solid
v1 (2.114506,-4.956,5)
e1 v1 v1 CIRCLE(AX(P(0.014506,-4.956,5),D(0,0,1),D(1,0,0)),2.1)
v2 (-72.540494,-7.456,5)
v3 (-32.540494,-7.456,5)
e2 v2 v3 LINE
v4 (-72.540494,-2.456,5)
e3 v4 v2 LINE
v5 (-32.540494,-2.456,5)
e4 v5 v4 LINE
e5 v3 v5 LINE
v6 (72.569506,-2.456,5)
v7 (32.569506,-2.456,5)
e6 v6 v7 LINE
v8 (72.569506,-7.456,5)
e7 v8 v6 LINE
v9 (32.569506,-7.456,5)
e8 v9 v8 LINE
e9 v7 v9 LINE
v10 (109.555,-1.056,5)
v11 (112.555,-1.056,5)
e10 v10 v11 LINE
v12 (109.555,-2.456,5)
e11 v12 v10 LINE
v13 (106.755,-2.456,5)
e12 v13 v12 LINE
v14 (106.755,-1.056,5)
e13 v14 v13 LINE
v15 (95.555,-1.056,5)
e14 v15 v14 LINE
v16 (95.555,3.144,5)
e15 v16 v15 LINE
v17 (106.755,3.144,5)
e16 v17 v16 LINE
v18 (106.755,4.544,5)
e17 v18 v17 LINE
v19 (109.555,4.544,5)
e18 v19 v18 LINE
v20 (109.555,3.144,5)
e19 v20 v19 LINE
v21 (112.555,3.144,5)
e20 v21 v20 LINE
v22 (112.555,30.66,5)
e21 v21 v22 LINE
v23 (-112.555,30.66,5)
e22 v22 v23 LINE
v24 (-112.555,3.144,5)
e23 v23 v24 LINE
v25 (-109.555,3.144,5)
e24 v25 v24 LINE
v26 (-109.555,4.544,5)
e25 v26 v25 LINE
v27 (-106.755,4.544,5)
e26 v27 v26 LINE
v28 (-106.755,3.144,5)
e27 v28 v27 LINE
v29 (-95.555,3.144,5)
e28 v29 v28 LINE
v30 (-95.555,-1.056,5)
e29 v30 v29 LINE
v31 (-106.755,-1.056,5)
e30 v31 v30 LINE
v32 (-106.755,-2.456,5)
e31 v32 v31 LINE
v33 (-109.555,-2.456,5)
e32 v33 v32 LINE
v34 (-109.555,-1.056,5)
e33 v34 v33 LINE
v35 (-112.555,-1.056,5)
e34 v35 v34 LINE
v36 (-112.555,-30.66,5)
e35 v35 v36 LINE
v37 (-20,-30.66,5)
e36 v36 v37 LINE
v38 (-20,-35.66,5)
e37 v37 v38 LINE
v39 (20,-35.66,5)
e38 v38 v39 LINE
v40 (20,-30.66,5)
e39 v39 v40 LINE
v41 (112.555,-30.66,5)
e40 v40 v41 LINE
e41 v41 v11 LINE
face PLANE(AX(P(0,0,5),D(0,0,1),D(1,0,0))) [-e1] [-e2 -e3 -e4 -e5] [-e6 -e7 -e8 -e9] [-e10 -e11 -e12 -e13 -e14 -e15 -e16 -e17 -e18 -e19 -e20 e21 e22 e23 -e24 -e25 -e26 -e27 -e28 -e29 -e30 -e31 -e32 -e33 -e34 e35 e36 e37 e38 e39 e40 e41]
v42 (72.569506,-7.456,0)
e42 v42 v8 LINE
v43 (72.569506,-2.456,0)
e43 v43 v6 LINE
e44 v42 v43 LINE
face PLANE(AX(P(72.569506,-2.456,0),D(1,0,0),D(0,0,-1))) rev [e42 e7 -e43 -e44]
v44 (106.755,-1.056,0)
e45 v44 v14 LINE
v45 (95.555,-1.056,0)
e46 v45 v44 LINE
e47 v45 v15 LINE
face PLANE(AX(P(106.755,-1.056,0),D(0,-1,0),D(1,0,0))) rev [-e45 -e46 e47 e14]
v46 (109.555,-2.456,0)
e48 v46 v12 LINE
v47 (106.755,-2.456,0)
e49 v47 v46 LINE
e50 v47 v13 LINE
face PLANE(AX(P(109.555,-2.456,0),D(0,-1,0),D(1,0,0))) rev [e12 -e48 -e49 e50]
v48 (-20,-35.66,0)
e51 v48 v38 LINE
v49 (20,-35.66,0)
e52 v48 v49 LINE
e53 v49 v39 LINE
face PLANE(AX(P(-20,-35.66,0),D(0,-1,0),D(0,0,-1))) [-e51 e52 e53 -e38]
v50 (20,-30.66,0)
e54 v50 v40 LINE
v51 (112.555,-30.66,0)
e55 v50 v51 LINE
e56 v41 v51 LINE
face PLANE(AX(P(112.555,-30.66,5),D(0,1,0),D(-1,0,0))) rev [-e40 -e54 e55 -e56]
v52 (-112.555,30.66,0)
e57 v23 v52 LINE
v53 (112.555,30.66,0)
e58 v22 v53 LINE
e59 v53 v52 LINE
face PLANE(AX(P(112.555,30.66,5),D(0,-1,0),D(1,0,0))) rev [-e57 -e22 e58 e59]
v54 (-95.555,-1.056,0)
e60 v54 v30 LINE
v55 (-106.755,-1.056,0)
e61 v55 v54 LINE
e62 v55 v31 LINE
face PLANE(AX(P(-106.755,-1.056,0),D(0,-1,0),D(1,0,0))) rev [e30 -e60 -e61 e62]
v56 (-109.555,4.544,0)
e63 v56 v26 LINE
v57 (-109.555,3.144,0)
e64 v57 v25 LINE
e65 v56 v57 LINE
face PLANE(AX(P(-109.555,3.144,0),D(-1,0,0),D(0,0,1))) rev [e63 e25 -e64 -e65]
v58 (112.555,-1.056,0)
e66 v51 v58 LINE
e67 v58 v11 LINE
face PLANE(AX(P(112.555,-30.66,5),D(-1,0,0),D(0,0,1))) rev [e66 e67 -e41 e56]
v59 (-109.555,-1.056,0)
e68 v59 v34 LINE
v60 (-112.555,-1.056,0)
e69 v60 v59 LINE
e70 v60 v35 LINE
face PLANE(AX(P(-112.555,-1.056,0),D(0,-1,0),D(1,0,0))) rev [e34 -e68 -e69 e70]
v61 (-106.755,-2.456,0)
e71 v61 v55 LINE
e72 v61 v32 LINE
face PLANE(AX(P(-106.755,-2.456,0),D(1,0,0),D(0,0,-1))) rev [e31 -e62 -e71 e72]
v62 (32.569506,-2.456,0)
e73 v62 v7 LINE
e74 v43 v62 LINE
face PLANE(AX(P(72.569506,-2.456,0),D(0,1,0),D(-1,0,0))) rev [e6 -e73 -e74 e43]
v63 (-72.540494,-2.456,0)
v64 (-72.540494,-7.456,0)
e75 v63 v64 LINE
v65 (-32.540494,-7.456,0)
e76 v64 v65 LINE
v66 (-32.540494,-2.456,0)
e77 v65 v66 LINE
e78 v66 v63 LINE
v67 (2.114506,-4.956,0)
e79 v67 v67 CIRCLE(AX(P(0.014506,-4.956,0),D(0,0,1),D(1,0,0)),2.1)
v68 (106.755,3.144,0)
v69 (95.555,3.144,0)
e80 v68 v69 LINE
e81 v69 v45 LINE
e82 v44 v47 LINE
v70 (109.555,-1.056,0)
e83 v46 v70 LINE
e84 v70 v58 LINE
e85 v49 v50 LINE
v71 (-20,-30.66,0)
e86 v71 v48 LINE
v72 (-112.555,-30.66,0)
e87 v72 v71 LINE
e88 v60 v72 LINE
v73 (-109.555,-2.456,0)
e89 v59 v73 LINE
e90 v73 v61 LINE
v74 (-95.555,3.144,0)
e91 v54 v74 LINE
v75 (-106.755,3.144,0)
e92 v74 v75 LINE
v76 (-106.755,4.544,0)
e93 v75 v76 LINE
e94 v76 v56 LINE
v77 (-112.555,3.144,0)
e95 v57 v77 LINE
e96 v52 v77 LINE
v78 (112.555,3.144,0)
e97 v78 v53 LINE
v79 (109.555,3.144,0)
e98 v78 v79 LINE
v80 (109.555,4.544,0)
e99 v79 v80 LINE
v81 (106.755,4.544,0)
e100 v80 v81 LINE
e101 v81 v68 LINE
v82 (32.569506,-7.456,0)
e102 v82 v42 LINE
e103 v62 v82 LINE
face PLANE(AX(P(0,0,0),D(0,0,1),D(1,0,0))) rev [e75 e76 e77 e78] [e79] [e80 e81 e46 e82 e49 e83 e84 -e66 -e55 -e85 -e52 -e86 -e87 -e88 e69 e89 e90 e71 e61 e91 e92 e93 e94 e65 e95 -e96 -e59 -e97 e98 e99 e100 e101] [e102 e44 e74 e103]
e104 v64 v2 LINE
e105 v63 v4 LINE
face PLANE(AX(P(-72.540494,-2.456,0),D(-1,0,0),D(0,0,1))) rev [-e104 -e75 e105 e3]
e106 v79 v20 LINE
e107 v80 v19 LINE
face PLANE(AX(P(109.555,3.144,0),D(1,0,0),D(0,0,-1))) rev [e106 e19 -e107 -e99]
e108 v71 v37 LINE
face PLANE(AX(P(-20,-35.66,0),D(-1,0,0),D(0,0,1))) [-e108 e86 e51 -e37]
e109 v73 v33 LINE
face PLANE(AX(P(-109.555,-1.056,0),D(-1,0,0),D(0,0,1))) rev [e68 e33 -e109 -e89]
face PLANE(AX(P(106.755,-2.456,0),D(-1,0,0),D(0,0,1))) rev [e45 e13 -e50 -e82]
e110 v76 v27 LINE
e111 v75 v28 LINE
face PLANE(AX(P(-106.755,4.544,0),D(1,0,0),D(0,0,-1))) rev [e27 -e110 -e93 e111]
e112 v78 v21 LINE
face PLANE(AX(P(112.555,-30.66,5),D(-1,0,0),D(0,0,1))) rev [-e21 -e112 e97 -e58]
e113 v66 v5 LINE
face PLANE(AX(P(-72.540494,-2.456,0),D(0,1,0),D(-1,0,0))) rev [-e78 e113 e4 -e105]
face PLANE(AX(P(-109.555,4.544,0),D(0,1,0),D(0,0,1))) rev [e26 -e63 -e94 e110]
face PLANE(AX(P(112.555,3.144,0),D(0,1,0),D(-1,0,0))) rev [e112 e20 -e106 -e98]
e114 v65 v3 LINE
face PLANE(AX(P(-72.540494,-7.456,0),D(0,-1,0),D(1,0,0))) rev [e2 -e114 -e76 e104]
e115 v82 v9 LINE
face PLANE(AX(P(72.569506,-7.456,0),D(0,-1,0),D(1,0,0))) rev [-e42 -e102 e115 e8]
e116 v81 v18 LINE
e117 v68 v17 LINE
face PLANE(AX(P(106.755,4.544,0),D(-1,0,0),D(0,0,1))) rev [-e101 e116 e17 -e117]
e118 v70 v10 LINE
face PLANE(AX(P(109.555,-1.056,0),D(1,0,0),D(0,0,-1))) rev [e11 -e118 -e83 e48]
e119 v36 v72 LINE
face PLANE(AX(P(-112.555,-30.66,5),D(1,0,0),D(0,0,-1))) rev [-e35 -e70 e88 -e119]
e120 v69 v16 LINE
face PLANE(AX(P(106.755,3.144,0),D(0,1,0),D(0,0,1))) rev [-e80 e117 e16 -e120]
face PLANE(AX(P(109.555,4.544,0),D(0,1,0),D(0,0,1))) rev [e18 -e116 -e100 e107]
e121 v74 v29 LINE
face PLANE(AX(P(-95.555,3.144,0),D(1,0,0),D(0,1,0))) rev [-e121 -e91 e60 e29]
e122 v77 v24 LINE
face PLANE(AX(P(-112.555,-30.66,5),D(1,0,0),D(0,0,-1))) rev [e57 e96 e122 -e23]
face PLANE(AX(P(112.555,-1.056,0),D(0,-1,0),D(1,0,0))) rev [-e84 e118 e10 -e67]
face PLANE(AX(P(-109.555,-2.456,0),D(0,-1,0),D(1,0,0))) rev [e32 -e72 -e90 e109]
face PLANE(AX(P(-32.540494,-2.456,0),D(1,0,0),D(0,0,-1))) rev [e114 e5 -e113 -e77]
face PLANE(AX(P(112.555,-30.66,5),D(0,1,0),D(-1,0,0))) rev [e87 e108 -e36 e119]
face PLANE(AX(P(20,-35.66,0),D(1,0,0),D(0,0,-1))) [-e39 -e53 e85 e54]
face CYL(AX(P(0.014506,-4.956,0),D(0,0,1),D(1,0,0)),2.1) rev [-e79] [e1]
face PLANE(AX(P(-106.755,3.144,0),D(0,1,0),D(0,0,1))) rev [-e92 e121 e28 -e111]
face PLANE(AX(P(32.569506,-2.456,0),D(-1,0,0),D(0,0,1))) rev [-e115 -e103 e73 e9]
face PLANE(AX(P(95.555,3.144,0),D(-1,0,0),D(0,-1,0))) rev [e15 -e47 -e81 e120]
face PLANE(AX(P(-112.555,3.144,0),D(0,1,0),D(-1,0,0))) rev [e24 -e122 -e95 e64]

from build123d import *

# Parameters (mm, degrees)
SKETCH1_W                 = 225.11
SKETCH1_H                 = 61.32
BOSS_EXTRUDE1_DEPTH       = 5
SKETCH2_R                 = 2.1
SKETCH2_W                 = 40
SKETCH2_H                 = 5
CUT_EXTRUDE1_DEPTH        = 5
BOSS_EXTRUDE2_START       = -5
BOSS_EXTRUDE2_DEPTH       = 5
BOSS_EXTRUDE2_2_OUTLINE_W = 40
BOSS_EXTRUDE2_2_OUTLINE_H = 5
BOSS_EXTRUDE2_2_DEPTH     = 5


# Read off the part's stored shape, not the designer's step: Boss-Extrude2
with BuildPart() as part:
    # Sketch1 → Boss-Extrude1 (new body)
    with BuildSketch(Plane.XY):
        Rectangle(SKETCH1_W, SKETCH1_H)
    extrude(amount=BOSS_EXTRUDE1_DEPTH)

    # Sketch2 → Cut-Extrude1 (cut)
    with BuildSketch(Plane.XY.offset(5)):
        with Locations((0.014505864, -4.956)):
            Circle(SKETCH2_R)
        with Locations((52.569505864, -4.956)):
            Rectangle(SKETCH2_W, SKETCH2_H)
        with Locations((-52.540494136, -4.956)):
            Rectangle(SKETCH2_W, SKETCH2_H)
    extrude(amount=-CUT_EXTRUDE1_DEPTH, mode=Mode.SUBTRACT)

    # Boss-Extrude2 outline → Boss-Extrude2 (cut)
    with BuildSketch(Plane.XY.offset(5).offset(BOSS_EXTRUDE2_START)):
        Polygon((109.555, -2.456), (109.555, -1.056), (112.555, -1.056), (112.555, 3.144), (109.555, 3.144), (109.555, 4.544), (106.755, 4.544), (106.755, 3.144), (95.555, 3.144), (95.555, -1.056), (106.755, -1.056), (106.755, -2.456), align=None)
        Polygon((-112.555, 3.144), (-112.555, -1.056), (-109.555, -1.056), (-109.555, -2.456), (-106.755, -2.456), (-106.755, -1.056), (-95.555, -1.056), (-95.555, 3.144), (-106.755, 3.144), (-106.755, 4.544), (-109.555, 4.544), (-109.555, 3.144), align=None)
    extrude(amount=BOSS_EXTRUDE2_DEPTH, mode=Mode.SUBTRACT)

    # Boss-Extrude2 2 outline → Boss-Extrude2 2 (add)
    with BuildSketch(Plane.XY.offset(5).offset(BOSS_EXTRUDE2_START)):
        with Locations((0, -33.16)):
            Rectangle(BOSS_EXTRUDE2_2_OUTLINE_W, BOSS_EXTRUDE2_2_OUTLINE_H)
    extrude(amount=BOSS_EXTRUDE2_2_DEPTH)


solid = part.part
